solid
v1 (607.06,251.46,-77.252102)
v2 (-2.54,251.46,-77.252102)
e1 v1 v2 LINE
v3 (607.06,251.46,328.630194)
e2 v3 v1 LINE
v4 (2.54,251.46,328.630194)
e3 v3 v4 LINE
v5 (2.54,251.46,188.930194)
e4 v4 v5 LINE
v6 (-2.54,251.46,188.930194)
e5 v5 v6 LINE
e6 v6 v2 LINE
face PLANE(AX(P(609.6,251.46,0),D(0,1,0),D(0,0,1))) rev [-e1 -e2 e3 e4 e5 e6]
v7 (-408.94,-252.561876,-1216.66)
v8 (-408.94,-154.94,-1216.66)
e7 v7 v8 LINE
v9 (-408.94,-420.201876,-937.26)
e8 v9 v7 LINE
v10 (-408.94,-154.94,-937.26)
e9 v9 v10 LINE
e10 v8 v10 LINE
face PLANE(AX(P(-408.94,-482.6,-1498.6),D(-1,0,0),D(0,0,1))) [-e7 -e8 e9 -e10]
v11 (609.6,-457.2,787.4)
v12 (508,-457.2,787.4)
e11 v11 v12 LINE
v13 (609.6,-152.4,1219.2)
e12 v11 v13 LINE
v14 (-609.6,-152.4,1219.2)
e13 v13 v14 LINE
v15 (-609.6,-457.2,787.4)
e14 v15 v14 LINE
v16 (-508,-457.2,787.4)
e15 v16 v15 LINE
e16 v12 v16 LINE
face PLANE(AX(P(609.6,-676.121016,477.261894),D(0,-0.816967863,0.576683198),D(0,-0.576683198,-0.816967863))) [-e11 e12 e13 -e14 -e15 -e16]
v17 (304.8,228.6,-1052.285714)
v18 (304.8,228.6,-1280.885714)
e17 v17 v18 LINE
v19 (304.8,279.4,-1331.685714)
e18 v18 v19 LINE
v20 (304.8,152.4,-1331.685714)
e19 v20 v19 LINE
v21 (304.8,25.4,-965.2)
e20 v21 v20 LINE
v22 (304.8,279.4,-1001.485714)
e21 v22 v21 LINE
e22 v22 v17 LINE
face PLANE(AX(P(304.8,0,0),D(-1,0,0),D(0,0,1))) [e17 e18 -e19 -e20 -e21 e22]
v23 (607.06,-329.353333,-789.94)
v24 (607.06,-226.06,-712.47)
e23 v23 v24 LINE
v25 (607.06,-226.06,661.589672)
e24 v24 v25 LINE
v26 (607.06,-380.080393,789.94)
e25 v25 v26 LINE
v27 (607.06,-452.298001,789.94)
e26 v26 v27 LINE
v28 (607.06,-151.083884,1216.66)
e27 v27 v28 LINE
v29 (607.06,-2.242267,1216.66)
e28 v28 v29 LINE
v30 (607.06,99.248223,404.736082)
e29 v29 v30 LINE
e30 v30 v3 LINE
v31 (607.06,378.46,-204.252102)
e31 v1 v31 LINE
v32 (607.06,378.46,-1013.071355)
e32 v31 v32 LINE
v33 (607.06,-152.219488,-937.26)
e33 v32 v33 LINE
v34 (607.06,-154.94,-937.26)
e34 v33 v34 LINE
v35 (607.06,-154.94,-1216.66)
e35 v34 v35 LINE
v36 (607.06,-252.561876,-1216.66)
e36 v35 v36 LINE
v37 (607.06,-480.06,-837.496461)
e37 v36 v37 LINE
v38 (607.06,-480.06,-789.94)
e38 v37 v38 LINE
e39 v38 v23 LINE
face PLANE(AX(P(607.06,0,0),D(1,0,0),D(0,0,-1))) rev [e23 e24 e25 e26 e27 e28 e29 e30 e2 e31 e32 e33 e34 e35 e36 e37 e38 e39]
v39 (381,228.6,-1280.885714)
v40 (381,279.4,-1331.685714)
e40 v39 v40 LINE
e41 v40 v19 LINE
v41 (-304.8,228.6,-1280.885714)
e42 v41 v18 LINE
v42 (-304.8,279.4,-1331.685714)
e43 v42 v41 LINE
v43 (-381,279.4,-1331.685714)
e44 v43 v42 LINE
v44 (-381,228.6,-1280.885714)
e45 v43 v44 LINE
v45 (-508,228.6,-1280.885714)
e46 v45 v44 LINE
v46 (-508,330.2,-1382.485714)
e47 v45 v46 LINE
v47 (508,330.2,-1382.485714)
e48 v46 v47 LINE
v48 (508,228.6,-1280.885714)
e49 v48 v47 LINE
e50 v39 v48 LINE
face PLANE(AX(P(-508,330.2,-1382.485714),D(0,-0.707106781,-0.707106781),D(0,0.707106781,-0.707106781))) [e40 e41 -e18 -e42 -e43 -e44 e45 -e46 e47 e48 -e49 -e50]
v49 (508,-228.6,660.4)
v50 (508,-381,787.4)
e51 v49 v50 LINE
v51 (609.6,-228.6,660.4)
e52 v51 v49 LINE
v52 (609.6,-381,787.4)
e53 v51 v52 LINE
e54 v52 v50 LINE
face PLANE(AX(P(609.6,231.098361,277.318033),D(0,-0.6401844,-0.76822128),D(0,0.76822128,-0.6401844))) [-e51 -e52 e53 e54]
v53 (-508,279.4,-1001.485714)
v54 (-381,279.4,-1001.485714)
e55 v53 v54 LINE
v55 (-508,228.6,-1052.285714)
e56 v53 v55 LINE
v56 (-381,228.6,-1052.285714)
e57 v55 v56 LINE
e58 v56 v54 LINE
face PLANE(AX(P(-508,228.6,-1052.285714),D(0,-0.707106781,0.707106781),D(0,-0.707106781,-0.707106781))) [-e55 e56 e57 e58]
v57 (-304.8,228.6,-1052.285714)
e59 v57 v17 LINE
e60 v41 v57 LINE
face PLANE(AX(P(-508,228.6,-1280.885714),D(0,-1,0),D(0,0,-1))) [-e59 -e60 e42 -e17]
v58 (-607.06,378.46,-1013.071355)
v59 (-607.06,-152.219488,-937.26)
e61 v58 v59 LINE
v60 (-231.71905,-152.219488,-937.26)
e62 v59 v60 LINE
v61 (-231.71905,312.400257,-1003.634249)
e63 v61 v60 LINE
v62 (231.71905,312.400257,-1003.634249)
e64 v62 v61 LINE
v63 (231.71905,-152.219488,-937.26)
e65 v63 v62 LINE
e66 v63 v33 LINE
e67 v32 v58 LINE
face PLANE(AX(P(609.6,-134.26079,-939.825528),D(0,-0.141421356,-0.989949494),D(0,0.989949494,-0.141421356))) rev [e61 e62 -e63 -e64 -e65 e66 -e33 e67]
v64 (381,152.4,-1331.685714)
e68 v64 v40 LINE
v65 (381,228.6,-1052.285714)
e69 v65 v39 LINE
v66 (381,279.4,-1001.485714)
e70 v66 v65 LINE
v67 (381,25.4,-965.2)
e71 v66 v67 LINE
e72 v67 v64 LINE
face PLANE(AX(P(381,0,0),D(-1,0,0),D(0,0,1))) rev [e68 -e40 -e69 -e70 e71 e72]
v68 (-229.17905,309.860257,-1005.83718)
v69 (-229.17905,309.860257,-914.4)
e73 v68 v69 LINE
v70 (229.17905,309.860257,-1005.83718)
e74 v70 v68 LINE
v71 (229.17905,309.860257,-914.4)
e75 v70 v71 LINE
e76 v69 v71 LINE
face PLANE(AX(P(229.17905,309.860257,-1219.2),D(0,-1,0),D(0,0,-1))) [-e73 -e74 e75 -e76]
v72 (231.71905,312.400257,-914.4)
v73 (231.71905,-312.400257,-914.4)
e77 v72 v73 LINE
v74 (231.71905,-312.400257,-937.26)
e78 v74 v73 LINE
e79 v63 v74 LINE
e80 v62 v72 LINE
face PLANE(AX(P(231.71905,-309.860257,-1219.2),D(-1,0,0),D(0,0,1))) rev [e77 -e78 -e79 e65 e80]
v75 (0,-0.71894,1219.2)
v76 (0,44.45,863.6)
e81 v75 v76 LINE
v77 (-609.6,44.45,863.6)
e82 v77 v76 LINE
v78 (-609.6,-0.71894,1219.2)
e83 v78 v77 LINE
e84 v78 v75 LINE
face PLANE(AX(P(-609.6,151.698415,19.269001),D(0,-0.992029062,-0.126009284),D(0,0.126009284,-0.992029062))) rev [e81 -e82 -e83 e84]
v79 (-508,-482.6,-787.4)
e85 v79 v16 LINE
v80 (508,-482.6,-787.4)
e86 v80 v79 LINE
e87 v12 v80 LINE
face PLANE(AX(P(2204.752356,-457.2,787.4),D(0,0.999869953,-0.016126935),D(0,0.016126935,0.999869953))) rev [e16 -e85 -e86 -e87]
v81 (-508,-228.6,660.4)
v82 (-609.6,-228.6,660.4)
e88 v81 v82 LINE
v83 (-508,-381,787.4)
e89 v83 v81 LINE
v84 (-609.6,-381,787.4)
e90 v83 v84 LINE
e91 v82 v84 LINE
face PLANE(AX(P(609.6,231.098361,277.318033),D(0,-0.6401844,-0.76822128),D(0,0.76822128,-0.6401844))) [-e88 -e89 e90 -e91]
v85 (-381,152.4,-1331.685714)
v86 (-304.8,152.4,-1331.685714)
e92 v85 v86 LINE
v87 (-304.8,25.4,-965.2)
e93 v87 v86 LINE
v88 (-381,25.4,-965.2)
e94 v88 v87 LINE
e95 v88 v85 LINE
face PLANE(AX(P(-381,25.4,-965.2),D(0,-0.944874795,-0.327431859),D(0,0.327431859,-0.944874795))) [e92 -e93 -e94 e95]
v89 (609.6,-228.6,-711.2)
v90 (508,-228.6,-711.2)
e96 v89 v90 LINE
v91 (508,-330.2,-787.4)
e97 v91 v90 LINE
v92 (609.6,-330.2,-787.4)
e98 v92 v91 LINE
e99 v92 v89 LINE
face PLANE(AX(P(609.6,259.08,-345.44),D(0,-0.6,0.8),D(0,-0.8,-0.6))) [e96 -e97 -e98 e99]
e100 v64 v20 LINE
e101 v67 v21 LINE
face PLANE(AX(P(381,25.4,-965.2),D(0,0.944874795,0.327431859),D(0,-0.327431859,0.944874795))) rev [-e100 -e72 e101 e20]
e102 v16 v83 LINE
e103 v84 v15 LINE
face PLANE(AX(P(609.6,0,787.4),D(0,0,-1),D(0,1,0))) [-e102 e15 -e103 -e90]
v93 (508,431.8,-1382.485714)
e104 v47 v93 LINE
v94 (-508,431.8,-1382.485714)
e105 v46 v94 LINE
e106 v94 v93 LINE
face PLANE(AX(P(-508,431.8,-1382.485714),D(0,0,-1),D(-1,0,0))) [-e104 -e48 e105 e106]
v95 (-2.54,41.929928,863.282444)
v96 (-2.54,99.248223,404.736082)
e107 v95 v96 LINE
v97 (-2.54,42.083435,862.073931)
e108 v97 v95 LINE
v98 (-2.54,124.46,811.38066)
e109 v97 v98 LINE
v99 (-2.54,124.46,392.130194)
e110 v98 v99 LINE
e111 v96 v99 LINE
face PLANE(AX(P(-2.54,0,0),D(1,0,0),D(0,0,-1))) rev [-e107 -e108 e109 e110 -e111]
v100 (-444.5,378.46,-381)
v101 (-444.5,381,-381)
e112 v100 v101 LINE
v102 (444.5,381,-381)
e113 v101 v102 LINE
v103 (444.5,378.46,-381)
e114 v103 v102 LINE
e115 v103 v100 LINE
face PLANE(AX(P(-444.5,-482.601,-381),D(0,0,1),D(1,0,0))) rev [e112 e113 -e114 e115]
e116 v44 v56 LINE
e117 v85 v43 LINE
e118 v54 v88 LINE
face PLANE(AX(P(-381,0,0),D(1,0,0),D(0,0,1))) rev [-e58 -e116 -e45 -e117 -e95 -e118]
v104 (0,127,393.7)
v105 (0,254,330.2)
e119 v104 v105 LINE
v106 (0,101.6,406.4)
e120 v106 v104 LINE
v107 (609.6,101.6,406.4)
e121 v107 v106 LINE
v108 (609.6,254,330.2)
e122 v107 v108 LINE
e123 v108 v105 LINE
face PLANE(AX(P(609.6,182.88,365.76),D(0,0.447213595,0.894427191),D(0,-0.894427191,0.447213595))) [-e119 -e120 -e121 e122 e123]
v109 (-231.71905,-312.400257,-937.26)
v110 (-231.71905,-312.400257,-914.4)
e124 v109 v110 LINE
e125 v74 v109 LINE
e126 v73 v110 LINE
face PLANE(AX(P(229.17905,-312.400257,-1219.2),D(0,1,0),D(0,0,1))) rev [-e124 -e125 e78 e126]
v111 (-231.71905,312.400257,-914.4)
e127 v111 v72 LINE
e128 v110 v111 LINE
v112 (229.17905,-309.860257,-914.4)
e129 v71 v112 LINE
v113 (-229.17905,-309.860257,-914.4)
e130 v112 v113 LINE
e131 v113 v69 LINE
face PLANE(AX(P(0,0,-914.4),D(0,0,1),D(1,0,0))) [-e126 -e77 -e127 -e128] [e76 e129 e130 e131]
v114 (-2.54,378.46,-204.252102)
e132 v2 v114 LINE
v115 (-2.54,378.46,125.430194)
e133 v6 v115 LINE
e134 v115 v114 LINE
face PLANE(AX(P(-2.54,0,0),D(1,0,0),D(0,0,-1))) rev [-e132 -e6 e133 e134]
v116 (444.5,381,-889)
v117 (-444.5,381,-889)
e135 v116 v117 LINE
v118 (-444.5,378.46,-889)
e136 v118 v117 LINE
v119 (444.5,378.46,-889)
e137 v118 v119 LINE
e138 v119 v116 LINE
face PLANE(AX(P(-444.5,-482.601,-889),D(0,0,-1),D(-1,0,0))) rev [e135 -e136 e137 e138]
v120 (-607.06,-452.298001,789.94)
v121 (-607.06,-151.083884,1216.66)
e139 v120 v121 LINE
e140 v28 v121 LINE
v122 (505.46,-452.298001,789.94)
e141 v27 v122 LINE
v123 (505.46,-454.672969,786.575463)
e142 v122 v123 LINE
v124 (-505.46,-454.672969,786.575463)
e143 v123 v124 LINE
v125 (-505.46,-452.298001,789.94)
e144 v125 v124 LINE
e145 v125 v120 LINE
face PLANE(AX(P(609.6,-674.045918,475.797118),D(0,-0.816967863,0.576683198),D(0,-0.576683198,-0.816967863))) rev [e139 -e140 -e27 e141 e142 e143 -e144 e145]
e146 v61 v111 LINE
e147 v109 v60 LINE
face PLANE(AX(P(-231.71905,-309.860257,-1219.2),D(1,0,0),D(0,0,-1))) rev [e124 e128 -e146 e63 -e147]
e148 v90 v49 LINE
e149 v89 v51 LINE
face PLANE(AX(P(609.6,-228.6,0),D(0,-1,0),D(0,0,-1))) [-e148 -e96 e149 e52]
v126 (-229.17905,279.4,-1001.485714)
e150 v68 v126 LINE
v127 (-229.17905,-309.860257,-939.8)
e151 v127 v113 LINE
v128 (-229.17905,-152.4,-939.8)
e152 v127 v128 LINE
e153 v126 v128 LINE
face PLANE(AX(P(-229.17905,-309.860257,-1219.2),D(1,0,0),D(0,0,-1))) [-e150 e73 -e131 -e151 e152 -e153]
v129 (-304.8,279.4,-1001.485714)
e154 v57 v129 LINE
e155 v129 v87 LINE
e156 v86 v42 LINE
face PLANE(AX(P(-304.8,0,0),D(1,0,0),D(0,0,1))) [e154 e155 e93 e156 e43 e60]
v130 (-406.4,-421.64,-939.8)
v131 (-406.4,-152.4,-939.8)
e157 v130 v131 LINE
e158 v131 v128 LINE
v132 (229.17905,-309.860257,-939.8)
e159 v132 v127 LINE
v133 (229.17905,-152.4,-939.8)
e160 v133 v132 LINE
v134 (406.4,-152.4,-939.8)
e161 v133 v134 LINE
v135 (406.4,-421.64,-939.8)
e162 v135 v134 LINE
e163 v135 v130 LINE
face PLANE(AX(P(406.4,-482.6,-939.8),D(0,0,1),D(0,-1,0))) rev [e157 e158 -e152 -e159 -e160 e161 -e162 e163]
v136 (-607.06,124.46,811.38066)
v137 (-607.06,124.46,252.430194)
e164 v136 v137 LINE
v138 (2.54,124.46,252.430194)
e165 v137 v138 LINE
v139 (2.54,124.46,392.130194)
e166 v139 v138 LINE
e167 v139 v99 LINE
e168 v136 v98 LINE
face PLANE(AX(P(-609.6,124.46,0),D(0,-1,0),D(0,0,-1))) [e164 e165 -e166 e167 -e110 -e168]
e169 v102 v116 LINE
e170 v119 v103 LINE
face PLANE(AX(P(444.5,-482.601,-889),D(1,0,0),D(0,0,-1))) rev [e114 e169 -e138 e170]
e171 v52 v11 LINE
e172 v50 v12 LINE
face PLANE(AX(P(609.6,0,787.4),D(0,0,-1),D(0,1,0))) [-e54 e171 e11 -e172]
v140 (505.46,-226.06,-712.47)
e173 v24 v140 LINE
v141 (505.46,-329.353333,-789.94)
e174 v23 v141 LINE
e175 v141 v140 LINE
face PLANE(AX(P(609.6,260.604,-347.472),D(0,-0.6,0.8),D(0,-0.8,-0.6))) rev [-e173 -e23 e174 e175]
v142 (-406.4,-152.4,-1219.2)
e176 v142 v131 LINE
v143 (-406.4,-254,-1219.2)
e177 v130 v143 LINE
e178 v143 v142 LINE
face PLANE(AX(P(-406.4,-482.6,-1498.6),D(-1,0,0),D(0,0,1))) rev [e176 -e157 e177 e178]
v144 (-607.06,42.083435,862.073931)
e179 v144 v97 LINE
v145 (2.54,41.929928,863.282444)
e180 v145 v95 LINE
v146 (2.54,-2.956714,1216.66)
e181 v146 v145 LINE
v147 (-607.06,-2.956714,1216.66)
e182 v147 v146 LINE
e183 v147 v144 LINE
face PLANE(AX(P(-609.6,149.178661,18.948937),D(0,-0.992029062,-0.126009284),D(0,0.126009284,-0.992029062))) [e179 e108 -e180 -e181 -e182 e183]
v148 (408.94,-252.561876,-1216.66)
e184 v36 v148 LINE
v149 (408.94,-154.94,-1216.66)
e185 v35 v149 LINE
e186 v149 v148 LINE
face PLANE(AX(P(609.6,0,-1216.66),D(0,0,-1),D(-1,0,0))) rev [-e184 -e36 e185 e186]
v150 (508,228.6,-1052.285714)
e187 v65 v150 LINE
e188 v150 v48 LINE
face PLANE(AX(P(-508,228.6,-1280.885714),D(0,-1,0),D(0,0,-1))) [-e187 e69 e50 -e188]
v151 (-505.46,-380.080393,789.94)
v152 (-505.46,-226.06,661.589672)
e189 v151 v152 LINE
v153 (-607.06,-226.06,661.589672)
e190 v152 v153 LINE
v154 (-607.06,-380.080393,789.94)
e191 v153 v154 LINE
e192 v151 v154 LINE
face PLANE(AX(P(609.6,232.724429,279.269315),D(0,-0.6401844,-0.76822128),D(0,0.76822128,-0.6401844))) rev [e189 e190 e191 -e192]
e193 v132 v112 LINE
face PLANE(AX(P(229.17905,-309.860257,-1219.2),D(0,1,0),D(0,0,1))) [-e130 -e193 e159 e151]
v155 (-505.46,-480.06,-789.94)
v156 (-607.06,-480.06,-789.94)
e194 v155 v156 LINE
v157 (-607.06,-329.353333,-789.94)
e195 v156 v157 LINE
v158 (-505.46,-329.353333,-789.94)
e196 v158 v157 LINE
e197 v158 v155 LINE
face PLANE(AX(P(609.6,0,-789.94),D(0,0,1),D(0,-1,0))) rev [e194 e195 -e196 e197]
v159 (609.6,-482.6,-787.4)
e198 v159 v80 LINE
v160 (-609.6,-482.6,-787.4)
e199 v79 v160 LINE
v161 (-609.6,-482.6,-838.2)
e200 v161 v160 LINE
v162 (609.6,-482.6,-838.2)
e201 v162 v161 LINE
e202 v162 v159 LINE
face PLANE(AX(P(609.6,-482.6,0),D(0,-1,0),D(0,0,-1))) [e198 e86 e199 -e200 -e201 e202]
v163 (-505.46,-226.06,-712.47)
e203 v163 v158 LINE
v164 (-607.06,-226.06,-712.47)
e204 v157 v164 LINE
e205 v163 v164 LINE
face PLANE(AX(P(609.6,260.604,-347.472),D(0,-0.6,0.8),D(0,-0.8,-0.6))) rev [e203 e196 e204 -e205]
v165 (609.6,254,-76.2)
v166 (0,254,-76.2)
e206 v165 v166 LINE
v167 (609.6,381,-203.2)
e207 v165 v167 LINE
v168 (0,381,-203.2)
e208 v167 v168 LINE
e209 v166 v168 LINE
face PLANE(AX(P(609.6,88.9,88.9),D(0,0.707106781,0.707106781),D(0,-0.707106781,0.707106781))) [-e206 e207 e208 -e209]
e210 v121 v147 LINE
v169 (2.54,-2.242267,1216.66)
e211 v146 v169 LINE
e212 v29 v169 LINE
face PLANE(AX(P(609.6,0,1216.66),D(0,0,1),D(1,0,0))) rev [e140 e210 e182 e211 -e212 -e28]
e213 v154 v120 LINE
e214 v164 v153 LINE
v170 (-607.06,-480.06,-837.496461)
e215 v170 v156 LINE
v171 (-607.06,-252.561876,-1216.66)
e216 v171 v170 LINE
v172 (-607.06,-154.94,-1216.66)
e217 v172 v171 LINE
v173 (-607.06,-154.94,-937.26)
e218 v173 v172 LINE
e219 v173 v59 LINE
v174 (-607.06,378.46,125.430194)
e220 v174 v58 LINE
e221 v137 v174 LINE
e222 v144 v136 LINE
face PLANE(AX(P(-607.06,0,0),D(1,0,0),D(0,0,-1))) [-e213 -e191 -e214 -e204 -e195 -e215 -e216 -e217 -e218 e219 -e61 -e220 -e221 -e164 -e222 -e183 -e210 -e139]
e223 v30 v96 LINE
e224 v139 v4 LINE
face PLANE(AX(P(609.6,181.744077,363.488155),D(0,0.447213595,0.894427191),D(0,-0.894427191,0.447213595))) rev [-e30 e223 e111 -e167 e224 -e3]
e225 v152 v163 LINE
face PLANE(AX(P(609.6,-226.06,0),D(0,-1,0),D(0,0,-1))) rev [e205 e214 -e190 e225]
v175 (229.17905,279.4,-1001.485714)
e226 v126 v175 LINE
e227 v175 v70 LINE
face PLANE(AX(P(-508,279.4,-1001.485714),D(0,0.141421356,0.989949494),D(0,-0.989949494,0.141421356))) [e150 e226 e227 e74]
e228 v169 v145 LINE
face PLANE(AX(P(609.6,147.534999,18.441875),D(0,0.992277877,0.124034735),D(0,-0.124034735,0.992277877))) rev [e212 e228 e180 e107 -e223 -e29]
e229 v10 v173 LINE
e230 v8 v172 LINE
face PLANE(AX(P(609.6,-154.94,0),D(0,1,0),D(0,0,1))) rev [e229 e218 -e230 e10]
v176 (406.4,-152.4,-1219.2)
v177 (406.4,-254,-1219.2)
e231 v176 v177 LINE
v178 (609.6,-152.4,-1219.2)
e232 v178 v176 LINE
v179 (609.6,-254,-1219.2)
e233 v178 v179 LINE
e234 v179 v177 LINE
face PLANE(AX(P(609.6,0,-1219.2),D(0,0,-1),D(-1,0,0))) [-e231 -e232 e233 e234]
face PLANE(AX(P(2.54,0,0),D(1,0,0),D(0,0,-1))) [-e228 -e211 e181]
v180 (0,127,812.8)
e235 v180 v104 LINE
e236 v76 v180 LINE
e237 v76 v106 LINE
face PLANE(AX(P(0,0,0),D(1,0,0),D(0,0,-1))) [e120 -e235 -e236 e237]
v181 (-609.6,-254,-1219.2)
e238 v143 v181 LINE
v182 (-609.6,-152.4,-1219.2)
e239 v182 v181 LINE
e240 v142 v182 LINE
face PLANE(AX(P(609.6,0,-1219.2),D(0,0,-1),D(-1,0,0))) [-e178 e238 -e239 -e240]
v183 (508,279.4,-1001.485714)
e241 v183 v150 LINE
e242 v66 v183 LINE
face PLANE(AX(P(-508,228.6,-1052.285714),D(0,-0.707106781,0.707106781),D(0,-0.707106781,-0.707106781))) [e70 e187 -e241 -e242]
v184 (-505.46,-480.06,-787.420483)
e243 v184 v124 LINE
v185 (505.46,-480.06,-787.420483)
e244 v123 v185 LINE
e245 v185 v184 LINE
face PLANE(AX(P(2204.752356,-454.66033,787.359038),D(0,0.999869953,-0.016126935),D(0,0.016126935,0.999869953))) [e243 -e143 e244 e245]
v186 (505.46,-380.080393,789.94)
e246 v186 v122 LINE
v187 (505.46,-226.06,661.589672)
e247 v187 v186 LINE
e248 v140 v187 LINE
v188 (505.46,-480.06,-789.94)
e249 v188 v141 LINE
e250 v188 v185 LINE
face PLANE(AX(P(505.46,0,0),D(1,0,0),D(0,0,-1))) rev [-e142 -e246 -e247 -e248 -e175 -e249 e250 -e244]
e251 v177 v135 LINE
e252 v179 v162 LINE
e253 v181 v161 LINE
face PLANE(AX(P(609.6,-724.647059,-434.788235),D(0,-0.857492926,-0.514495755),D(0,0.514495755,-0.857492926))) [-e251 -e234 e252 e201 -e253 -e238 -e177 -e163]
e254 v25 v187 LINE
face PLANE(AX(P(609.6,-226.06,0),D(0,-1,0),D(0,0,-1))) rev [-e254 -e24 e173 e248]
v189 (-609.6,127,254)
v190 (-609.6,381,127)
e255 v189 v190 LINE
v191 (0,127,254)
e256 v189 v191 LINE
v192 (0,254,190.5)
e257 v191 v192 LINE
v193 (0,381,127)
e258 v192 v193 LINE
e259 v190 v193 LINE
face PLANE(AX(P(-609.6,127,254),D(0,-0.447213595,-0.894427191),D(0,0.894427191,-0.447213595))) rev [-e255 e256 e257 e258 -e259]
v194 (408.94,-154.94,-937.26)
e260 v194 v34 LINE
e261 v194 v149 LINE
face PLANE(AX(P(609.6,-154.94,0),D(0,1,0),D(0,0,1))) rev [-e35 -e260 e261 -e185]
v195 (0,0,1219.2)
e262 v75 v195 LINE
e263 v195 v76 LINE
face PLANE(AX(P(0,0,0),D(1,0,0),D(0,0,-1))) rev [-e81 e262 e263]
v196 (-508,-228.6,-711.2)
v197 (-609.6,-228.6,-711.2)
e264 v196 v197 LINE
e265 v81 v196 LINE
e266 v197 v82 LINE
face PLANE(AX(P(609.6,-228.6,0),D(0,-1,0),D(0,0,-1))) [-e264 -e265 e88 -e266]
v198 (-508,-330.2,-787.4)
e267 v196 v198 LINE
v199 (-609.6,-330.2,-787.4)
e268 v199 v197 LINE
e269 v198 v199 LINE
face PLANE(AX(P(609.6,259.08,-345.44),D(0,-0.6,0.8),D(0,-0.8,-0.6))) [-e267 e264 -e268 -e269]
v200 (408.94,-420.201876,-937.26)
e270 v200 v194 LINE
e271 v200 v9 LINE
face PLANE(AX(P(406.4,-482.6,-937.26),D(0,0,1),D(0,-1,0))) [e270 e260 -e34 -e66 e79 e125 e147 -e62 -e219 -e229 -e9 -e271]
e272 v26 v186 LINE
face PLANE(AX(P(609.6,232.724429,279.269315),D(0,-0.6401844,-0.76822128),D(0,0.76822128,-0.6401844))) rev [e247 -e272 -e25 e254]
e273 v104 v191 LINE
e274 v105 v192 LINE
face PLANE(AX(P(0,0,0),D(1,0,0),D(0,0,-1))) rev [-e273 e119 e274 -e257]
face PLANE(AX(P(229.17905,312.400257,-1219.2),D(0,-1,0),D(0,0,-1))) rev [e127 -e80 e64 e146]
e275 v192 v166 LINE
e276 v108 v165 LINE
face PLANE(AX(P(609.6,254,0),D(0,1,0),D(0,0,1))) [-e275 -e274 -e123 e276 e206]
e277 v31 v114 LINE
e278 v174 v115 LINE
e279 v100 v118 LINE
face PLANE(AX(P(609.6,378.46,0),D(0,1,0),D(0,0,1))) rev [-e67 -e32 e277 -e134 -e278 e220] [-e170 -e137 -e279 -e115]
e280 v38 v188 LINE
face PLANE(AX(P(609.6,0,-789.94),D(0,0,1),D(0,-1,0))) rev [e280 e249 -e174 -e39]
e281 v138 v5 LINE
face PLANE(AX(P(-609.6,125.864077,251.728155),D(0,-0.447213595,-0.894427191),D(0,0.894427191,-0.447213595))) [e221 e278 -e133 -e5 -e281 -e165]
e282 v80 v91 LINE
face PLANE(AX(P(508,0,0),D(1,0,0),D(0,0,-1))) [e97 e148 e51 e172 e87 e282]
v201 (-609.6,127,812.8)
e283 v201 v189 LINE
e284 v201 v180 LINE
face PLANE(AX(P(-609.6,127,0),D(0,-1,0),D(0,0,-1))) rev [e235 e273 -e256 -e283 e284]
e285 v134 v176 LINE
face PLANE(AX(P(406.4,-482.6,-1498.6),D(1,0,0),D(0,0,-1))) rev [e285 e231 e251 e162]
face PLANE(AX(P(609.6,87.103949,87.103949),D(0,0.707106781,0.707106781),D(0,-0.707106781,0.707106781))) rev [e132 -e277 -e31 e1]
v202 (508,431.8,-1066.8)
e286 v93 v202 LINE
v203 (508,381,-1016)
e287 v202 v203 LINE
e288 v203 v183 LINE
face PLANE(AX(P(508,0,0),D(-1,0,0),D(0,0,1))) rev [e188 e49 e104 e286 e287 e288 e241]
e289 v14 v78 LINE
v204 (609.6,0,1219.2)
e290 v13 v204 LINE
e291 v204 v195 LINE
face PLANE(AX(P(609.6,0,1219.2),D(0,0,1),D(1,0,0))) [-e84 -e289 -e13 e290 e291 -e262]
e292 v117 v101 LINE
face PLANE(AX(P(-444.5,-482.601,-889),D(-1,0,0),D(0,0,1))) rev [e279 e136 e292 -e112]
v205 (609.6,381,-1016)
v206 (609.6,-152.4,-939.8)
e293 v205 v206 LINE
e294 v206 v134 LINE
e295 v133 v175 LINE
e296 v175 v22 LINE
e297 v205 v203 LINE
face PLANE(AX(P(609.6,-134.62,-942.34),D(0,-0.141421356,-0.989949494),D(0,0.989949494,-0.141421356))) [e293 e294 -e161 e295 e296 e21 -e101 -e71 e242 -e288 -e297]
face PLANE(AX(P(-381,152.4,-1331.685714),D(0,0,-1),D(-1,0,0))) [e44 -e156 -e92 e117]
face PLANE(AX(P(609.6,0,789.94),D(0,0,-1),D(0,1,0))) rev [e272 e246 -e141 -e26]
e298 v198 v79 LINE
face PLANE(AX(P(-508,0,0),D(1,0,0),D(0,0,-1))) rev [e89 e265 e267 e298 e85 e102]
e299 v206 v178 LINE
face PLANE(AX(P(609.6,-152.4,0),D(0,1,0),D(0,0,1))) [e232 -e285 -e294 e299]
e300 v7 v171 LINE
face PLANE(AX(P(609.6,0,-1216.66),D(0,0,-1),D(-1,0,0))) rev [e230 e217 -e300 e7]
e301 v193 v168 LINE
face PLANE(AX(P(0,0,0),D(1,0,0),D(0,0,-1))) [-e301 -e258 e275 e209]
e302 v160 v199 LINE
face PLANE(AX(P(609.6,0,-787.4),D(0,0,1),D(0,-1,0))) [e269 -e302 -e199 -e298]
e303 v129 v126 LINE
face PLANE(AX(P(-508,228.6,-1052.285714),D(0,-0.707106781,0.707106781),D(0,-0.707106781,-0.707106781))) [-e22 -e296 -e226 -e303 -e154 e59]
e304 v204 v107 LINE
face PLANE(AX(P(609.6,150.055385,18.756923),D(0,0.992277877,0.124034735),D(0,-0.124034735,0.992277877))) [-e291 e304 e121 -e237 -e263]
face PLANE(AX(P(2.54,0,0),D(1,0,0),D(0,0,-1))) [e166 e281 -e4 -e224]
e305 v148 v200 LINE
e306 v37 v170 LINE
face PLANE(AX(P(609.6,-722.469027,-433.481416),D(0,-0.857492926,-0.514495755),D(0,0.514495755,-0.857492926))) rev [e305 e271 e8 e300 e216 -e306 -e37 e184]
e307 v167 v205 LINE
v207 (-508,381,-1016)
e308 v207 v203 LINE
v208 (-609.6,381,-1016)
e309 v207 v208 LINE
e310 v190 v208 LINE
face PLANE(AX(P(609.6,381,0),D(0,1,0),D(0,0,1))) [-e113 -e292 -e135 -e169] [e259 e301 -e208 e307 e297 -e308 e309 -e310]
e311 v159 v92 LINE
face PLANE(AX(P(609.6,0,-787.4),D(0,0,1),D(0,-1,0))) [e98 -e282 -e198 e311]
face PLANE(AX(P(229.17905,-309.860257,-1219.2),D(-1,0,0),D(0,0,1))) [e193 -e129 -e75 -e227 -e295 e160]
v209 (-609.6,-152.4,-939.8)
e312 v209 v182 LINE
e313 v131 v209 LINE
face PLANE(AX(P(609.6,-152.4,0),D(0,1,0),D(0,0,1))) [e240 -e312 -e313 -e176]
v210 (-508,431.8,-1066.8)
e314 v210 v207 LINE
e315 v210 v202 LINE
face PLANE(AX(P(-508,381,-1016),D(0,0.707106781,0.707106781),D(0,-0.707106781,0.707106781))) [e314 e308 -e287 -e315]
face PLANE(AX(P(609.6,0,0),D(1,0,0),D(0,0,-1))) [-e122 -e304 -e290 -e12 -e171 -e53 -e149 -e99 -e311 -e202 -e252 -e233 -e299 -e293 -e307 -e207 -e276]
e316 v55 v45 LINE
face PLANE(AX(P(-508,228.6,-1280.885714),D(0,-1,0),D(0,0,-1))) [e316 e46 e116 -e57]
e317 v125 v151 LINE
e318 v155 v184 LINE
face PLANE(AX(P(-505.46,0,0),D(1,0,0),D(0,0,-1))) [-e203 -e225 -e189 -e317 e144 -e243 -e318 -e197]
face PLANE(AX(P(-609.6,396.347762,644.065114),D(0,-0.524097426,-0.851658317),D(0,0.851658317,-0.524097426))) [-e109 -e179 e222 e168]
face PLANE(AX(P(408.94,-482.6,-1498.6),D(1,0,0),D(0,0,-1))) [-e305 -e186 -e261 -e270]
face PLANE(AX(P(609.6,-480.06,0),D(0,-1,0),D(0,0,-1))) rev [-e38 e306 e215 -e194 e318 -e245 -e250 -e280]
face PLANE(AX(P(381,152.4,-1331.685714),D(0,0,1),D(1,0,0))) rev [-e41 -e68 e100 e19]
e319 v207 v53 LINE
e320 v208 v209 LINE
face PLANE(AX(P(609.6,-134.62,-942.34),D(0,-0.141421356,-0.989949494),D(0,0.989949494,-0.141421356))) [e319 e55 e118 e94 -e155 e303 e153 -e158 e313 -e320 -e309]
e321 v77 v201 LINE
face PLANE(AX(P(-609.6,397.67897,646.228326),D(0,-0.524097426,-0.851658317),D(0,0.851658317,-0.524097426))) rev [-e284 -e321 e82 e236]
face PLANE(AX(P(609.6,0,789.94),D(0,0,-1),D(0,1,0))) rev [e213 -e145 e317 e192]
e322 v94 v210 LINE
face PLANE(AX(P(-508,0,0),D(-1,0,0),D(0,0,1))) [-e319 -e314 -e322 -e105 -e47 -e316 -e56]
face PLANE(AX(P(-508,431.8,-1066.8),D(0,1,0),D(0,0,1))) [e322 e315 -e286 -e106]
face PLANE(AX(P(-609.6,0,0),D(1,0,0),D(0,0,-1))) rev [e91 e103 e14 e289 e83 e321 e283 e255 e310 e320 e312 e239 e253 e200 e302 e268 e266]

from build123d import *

# Parameters (mm, degrees)
BOSS_EXTRUDE1_DEPTH      = 609.6
BOSS_EXTRUDE2_DEPTH      = 609.6
BOSS_EXTRUDE4_DEPTH      = 508
BOSS_EXTRUDE4_DEPTH_BACK = 508
SKETCH4_W                = 812.8
SKETCH4_H                = 558.8
CUT_EXTRUDE1_DEPTH       = 1464.754200677
CUT_EXTRUDE2_DEPTH       = 2295.732210956
CUT_EXTRUDE2_DEPTH_BACK  = 25.4
SKETCH5_W                = 458.358099056
SKETCH5_H                = 619.720514452
SHELL2_START             = -505.46
SHELL2_DEPTH             = 1010.92
SHELL2_START_2           = -607.06
SHELL2_2_DEPTH           = 1214.12
SHELL2_3_DEPTH           = 604.52
SHELL2_START_3           = 408.94
SHELL2_4_DEPTH           = 198.12
SHELL2_5_DEPTH           = 198.12
SHELL2_START_4           = 231.719049528
SHELL2_6_DEPTH           = 177.220950472
SHELL2_START_5           = -408.94
SHELL2_7_DEPTH           = 177.220950472
SHELL2_START_6           = 2.54
SHELL2_8_DEPTH           = 229.179049528
BOSS_EXTRUDE5_DEPTH      = 508
BOSS_EXTRUDE5_DEPTH_BACK = 508
BOSS_EXTRUDE6_DEPTH      = 76.2
CUT_EXTRUDE3_REACH       = 1742.311
SKETCH9_W                = 889
SKETCH9_H                = 508


# Read off the part's stored shape, not the designer's step: Shell2
with BuildPart() as part:
    # Left Side → Boss-Extrude1 (new body)
    with BuildSketch(Plane(origin=(0, 0, 0), x_dir=(0, 0, -1), z_dir=(1, 0, 0))):
        Polygon((-787.4, -381), (-787.4, -457.2), (-1219.2, -152.4), (-1219.2, 0), (-406.4, 101.6), (-330.2, 254), (76.2, 254), (203.2, 381), (1016, 381), (939.8, -152.4), (1219.2, -152.4), (1219.2, -254), (838.2, -482.6), (787.4, -482.6), (787.4, -330.2), (711.2, -228.6), (-660.4, -228.6), align=None)
    extrude(amount=BOSS_EXTRUDE1_DEPTH)

    # Sketch1 → Boss-Extrude2 (add)
    with BuildSketch(Plane(origin=(0, 0, 0), x_dir=(0, 0, -1), z_dir=(1, 0, 0))):
        Polygon((-787.4, -381), (-787.4, -457.2), (-1219.2, -152.4), (-1219.2, -0.718940146), (-863.6, 44.45), (-812.8, 127), (-254, 127), (-127, 381), (1016, 381), (939.8, -152.4), (1219.2, -152.4), (1219.2, -254), (838.2, -482.6), (787.4, -482.6), (787.4, -330.2), (711.2, -228.6), (-660.4, -228.6), align=None)
    extrude(amount=-BOSS_EXTRUDE2_DEPTH)

    # Sketch3 → Boss-Extrude4 (add, two sides: drawn at the far end of the back side and taken through both)
    with BuildSketch(Plane(origin=(0, 0, 0), x_dir=(0, 0, -1), z_dir=(1, 0, 0)).offset(-BOSS_EXTRUDE4_DEPTH_BACK)):
        Polygon((-787.4, -457.2), (787.4, -482.6), (787.4, -330.2), (711.2, -228.6), (-660.4, -228.6), (-787.4, -381), align=None)
    extrude(amount=BOSS_EXTRUDE4_DEPTH + BOSS_EXTRUDE4_DEPTH_BACK)

    # Sketch4 → Cut-Extrude1 (cut, through all)
    with BuildSketch(Plane(origin=(0, -152.4, 0), x_dir=(1, 0, 0), z_dir=(0, 1, 0))):
        with Locations((0, 1219.2)):
            Rectangle(SKETCH4_W, SKETCH4_H)
    extrude(amount=-CUT_EXTRUDE1_DEPTH, mode=Mode.SUBTRACT)

    # Sketch5 → Cut-Extrude2 (cut, two sides: drawn at the far end of the back side and taken through both)
    with BuildSketch(Plane(origin=(0, 0, -939.8), x_dir=(-1, 0, 0), z_dir=(0, 0, -1)).offset(-CUT_EXTRUDE2_DEPTH_BACK)):
        Rectangle(SKETCH5_W, SKETCH5_H)
    extrude(amount=CUT_EXTRUDE2_DEPTH + CUT_EXTRUDE2_DEPTH_BACK, mode=Mode.SUBTRACT)

    # Shell2 outline → Shell2 (cut)
    with BuildSketch(Plane.YZ.offset(SHELL2_START)):
        Polygon((312.400257226, -914.4), (312.400257226, -1003.634249283), (378.46, -1013.071355394), (378.46, -204.252102448), (251.46, -77.252102448), (251.46, 188.930193669), (124.46, 252.430193669), (124.46, 392.130193669), (99.248222887, 404.736082225), (41.929927698, 863.282443734), (-2.956713718, 1216.66), (-151.083883753, 1216.66), (-454.672968619, 786.575463107), (-480.06, -787.420482539), (-480.06, -837.496460729), (-420.201876437, -937.26), (-312.400257226, -937.26), (-312.400257226, -914.4), align=None)
    extrude(amount=SHELL2_DEPTH, mode=Mode.SUBTRACT)

    # Shell2 2 outline → Shell2 2 (cut)
    with BuildSketch(Plane.YZ.offset(SHELL2_START_2)):
        Polygon((312.400257226, -914.4), (312.400257226, -1003.634249283), (378.46, -1013.071355394), (378.46, -204.252102448), (251.46, -77.252102448), (251.46, 188.930193669), (124.46, 252.430193669), (124.46, 392.130193669), (99.248222887, 404.736082225), (41.929927698, 863.282443734), (-2.956713718, 1216.66), (-151.083883753, 1216.66), (-452.2980014, 789.94), (-380.080393165, 789.94), (-226.06, 661.589672363), (-226.06, -712.47), (-329.353333333, -789.94), (-480.06, -789.94), (-480.06, -837.496460729), (-420.201876437, -937.26), (-312.400257226, -937.26), (-312.400257226, -914.4), align=None)
    extrude(amount=SHELL2_2_DEPTH, mode=Mode.SUBTRACT)

    # Shell2 3 outline → Shell2 3 (cut)
    with BuildSketch(Plane.YZ.offset(SHELL2_START_2)):
        Polygon((378.46, 125.430193669), (251.46, 188.930193669), (251.46, -77.252102448), (378.46, -204.252102448), align=None)
        Polygon((99.248222887, 404.736082225), (124.46, 392.130193669), (124.46, 811.380660207), (42.083435134, 862.073930894), (41.929927698, 863.282443734), align=None)
    extrude(amount=SHELL2_3_DEPTH, mode=Mode.SUBTRACT)

    # Shell2 4 outline → Shell2 4 (cut)
    with BuildSketch(Plane.YZ.offset(SHELL2_START_3)):
        Polygon((-154.94, -937.26), (-152.219487758, -937.26), (312.400257226, -1003.634249283), (312.400257226, -914.4), (-312.400257226, -914.4), (-312.400257226, -937.26), (-420.201876437, -937.26), (-252.561876437, -1216.66), (-154.94, -1216.66), align=None)
        Polygon((124.46, 252.430193669), (251.46, 188.930193669), (251.46, 328.630193669), (124.46, 392.130193669), align=None)
        Polygon((-2.242266835, 1216.66), (-2.956713718, 1216.66), (41.929927698, 863.282443734), align=None)
    extrude(amount=SHELL2_4_DEPTH, mode=Mode.SUBTRACT)

    # Shell2 5 outline → Shell2 5 (cut)
    with BuildSketch(Plane.YZ.offset(SHELL2_START_2)):
        Polygon((-154.94, -937.26), (-152.219487758, -937.26), (312.400257226, -1003.634249283), (312.400257226, -914.4), (-312.400257226, -914.4), (-312.400257226, -937.26), (-420.201876437, -937.26), (-252.561876437, -1216.66), (-154.94, -1216.66), align=None)
    extrude(amount=SHELL2_5_DEPTH, mode=Mode.SUBTRACT)

    # Shell2 6 outline → Shell2 6 (cut)
    with BuildSketch(Plane.YZ.offset(SHELL2_START_4)):
        Polygon((-312.400257226, -937.26), (-152.219487758, -937.26), (312.400257226, -1003.634249283), (312.400257226, -914.4), (-312.400257226, -914.4), align=None)
        Polygon((124.46, 252.430193669), (251.46, 188.930193669), (251.46, 328.630193669), (124.46, 392.130193669), align=None)
        Polygon((-2.242266835, 1216.66), (-2.956713718, 1216.66), (41.929927698, 863.282443734), align=None)
    extrude(amount=SHELL2_6_DEPTH, mode=Mode.SUBTRACT)

    # Shell2 7 outline → Shell2 7 (cut)
    with BuildSketch(Plane.YZ.offset(SHELL2_START_5)):
        Polygon((-312.400257226, -937.26), (-152.219487758, -937.26), (312.400257226, -1003.634249283), (312.400257226, -914.4), (-312.400257226, -914.4), align=None)
    extrude(amount=SHELL2_7_DEPTH, mode=Mode.SUBTRACT)

    # Shell2 8 outline → Shell2 8 (cut)
    with BuildSketch(Plane.YZ.offset(SHELL2_START_6)):
        Polygon((124.46, 252.430193669), (251.46, 188.930193669), (251.46, 328.630193669), (124.46, 392.130193669), align=None)
        Polygon((-2.242266835, 1216.66), (-2.956713718, 1216.66), (41.929927698, 863.282443734), align=None)
    extrude(amount=SHELL2_8_DEPTH, mode=Mode.SUBTRACT)

    # Sketch7 → Boss-Extrude5 (add, two sides: drawn at the far end of the back side and taken through both)
    with BuildSketch(Plane(origin=(0, 0, 0), x_dir=(0, 0, -1), z_dir=(1, 0, 0)).offset(-BOSS_EXTRUDE5_DEPTH_BACK)):
        Polygon((1016, 381), (1066.8, 431.8), (1382.485714286, 431.8), (1382.485714286, 330.2), (1280.885714286, 228.6), (1052.285714286, 228.6), (1001.485714286, 279.4), align=None)
    extrude(amount=BOSS_EXTRUDE5_DEPTH + BOSS_EXTRUDE5_DEPTH_BACK)

    # Sketch8 → Boss-Extrude6 (add)
    with BuildSketch(Plane(origin=(304.8, 0, 0), x_dir=(0, 0, -1), z_dir=(1, 0, 0))):
        Polygon((1001.485714286, 279.4), (965.2, 25.4), (1331.685714286, 152.4), (1331.685714286, 279.4), align=None)
    boss_extrude6 = extrude(amount=BOSS_EXTRUDE6_DEPTH)

    # Mirror1: Boss-Extrude6 across plane
    add(boss_extrude6.mirror(Plane(origin=(0, 0, 0), x_dir=(0, 0, 1), z_dir=(1, 0, 0))))

    # Sketch9 → Cut-Extrude3 (cut, up to next)
    with BuildSketch(Plane(origin=(0, 381, 0), x_dir=(1, 0, 0), z_dir=(0, 1, 0)), mode=Mode.PRIVATE) as cut_extrude3_sk1:
        with Locations((0, 635)):
            Rectangle(SKETCH9_W, SKETCH9_H)
    cut_extrude3_tool1 = extrude(cut_extrude3_sk1.sketch, amount=-CUT_EXTRUDE3_REACH, mode=Mode.PRIVATE) & part.part
    add(cut_extrude3_tool1.solids().sort_by_distance((0, 381, -635))[0], mode=Mode.SUBTRACT)


solid = part.part
